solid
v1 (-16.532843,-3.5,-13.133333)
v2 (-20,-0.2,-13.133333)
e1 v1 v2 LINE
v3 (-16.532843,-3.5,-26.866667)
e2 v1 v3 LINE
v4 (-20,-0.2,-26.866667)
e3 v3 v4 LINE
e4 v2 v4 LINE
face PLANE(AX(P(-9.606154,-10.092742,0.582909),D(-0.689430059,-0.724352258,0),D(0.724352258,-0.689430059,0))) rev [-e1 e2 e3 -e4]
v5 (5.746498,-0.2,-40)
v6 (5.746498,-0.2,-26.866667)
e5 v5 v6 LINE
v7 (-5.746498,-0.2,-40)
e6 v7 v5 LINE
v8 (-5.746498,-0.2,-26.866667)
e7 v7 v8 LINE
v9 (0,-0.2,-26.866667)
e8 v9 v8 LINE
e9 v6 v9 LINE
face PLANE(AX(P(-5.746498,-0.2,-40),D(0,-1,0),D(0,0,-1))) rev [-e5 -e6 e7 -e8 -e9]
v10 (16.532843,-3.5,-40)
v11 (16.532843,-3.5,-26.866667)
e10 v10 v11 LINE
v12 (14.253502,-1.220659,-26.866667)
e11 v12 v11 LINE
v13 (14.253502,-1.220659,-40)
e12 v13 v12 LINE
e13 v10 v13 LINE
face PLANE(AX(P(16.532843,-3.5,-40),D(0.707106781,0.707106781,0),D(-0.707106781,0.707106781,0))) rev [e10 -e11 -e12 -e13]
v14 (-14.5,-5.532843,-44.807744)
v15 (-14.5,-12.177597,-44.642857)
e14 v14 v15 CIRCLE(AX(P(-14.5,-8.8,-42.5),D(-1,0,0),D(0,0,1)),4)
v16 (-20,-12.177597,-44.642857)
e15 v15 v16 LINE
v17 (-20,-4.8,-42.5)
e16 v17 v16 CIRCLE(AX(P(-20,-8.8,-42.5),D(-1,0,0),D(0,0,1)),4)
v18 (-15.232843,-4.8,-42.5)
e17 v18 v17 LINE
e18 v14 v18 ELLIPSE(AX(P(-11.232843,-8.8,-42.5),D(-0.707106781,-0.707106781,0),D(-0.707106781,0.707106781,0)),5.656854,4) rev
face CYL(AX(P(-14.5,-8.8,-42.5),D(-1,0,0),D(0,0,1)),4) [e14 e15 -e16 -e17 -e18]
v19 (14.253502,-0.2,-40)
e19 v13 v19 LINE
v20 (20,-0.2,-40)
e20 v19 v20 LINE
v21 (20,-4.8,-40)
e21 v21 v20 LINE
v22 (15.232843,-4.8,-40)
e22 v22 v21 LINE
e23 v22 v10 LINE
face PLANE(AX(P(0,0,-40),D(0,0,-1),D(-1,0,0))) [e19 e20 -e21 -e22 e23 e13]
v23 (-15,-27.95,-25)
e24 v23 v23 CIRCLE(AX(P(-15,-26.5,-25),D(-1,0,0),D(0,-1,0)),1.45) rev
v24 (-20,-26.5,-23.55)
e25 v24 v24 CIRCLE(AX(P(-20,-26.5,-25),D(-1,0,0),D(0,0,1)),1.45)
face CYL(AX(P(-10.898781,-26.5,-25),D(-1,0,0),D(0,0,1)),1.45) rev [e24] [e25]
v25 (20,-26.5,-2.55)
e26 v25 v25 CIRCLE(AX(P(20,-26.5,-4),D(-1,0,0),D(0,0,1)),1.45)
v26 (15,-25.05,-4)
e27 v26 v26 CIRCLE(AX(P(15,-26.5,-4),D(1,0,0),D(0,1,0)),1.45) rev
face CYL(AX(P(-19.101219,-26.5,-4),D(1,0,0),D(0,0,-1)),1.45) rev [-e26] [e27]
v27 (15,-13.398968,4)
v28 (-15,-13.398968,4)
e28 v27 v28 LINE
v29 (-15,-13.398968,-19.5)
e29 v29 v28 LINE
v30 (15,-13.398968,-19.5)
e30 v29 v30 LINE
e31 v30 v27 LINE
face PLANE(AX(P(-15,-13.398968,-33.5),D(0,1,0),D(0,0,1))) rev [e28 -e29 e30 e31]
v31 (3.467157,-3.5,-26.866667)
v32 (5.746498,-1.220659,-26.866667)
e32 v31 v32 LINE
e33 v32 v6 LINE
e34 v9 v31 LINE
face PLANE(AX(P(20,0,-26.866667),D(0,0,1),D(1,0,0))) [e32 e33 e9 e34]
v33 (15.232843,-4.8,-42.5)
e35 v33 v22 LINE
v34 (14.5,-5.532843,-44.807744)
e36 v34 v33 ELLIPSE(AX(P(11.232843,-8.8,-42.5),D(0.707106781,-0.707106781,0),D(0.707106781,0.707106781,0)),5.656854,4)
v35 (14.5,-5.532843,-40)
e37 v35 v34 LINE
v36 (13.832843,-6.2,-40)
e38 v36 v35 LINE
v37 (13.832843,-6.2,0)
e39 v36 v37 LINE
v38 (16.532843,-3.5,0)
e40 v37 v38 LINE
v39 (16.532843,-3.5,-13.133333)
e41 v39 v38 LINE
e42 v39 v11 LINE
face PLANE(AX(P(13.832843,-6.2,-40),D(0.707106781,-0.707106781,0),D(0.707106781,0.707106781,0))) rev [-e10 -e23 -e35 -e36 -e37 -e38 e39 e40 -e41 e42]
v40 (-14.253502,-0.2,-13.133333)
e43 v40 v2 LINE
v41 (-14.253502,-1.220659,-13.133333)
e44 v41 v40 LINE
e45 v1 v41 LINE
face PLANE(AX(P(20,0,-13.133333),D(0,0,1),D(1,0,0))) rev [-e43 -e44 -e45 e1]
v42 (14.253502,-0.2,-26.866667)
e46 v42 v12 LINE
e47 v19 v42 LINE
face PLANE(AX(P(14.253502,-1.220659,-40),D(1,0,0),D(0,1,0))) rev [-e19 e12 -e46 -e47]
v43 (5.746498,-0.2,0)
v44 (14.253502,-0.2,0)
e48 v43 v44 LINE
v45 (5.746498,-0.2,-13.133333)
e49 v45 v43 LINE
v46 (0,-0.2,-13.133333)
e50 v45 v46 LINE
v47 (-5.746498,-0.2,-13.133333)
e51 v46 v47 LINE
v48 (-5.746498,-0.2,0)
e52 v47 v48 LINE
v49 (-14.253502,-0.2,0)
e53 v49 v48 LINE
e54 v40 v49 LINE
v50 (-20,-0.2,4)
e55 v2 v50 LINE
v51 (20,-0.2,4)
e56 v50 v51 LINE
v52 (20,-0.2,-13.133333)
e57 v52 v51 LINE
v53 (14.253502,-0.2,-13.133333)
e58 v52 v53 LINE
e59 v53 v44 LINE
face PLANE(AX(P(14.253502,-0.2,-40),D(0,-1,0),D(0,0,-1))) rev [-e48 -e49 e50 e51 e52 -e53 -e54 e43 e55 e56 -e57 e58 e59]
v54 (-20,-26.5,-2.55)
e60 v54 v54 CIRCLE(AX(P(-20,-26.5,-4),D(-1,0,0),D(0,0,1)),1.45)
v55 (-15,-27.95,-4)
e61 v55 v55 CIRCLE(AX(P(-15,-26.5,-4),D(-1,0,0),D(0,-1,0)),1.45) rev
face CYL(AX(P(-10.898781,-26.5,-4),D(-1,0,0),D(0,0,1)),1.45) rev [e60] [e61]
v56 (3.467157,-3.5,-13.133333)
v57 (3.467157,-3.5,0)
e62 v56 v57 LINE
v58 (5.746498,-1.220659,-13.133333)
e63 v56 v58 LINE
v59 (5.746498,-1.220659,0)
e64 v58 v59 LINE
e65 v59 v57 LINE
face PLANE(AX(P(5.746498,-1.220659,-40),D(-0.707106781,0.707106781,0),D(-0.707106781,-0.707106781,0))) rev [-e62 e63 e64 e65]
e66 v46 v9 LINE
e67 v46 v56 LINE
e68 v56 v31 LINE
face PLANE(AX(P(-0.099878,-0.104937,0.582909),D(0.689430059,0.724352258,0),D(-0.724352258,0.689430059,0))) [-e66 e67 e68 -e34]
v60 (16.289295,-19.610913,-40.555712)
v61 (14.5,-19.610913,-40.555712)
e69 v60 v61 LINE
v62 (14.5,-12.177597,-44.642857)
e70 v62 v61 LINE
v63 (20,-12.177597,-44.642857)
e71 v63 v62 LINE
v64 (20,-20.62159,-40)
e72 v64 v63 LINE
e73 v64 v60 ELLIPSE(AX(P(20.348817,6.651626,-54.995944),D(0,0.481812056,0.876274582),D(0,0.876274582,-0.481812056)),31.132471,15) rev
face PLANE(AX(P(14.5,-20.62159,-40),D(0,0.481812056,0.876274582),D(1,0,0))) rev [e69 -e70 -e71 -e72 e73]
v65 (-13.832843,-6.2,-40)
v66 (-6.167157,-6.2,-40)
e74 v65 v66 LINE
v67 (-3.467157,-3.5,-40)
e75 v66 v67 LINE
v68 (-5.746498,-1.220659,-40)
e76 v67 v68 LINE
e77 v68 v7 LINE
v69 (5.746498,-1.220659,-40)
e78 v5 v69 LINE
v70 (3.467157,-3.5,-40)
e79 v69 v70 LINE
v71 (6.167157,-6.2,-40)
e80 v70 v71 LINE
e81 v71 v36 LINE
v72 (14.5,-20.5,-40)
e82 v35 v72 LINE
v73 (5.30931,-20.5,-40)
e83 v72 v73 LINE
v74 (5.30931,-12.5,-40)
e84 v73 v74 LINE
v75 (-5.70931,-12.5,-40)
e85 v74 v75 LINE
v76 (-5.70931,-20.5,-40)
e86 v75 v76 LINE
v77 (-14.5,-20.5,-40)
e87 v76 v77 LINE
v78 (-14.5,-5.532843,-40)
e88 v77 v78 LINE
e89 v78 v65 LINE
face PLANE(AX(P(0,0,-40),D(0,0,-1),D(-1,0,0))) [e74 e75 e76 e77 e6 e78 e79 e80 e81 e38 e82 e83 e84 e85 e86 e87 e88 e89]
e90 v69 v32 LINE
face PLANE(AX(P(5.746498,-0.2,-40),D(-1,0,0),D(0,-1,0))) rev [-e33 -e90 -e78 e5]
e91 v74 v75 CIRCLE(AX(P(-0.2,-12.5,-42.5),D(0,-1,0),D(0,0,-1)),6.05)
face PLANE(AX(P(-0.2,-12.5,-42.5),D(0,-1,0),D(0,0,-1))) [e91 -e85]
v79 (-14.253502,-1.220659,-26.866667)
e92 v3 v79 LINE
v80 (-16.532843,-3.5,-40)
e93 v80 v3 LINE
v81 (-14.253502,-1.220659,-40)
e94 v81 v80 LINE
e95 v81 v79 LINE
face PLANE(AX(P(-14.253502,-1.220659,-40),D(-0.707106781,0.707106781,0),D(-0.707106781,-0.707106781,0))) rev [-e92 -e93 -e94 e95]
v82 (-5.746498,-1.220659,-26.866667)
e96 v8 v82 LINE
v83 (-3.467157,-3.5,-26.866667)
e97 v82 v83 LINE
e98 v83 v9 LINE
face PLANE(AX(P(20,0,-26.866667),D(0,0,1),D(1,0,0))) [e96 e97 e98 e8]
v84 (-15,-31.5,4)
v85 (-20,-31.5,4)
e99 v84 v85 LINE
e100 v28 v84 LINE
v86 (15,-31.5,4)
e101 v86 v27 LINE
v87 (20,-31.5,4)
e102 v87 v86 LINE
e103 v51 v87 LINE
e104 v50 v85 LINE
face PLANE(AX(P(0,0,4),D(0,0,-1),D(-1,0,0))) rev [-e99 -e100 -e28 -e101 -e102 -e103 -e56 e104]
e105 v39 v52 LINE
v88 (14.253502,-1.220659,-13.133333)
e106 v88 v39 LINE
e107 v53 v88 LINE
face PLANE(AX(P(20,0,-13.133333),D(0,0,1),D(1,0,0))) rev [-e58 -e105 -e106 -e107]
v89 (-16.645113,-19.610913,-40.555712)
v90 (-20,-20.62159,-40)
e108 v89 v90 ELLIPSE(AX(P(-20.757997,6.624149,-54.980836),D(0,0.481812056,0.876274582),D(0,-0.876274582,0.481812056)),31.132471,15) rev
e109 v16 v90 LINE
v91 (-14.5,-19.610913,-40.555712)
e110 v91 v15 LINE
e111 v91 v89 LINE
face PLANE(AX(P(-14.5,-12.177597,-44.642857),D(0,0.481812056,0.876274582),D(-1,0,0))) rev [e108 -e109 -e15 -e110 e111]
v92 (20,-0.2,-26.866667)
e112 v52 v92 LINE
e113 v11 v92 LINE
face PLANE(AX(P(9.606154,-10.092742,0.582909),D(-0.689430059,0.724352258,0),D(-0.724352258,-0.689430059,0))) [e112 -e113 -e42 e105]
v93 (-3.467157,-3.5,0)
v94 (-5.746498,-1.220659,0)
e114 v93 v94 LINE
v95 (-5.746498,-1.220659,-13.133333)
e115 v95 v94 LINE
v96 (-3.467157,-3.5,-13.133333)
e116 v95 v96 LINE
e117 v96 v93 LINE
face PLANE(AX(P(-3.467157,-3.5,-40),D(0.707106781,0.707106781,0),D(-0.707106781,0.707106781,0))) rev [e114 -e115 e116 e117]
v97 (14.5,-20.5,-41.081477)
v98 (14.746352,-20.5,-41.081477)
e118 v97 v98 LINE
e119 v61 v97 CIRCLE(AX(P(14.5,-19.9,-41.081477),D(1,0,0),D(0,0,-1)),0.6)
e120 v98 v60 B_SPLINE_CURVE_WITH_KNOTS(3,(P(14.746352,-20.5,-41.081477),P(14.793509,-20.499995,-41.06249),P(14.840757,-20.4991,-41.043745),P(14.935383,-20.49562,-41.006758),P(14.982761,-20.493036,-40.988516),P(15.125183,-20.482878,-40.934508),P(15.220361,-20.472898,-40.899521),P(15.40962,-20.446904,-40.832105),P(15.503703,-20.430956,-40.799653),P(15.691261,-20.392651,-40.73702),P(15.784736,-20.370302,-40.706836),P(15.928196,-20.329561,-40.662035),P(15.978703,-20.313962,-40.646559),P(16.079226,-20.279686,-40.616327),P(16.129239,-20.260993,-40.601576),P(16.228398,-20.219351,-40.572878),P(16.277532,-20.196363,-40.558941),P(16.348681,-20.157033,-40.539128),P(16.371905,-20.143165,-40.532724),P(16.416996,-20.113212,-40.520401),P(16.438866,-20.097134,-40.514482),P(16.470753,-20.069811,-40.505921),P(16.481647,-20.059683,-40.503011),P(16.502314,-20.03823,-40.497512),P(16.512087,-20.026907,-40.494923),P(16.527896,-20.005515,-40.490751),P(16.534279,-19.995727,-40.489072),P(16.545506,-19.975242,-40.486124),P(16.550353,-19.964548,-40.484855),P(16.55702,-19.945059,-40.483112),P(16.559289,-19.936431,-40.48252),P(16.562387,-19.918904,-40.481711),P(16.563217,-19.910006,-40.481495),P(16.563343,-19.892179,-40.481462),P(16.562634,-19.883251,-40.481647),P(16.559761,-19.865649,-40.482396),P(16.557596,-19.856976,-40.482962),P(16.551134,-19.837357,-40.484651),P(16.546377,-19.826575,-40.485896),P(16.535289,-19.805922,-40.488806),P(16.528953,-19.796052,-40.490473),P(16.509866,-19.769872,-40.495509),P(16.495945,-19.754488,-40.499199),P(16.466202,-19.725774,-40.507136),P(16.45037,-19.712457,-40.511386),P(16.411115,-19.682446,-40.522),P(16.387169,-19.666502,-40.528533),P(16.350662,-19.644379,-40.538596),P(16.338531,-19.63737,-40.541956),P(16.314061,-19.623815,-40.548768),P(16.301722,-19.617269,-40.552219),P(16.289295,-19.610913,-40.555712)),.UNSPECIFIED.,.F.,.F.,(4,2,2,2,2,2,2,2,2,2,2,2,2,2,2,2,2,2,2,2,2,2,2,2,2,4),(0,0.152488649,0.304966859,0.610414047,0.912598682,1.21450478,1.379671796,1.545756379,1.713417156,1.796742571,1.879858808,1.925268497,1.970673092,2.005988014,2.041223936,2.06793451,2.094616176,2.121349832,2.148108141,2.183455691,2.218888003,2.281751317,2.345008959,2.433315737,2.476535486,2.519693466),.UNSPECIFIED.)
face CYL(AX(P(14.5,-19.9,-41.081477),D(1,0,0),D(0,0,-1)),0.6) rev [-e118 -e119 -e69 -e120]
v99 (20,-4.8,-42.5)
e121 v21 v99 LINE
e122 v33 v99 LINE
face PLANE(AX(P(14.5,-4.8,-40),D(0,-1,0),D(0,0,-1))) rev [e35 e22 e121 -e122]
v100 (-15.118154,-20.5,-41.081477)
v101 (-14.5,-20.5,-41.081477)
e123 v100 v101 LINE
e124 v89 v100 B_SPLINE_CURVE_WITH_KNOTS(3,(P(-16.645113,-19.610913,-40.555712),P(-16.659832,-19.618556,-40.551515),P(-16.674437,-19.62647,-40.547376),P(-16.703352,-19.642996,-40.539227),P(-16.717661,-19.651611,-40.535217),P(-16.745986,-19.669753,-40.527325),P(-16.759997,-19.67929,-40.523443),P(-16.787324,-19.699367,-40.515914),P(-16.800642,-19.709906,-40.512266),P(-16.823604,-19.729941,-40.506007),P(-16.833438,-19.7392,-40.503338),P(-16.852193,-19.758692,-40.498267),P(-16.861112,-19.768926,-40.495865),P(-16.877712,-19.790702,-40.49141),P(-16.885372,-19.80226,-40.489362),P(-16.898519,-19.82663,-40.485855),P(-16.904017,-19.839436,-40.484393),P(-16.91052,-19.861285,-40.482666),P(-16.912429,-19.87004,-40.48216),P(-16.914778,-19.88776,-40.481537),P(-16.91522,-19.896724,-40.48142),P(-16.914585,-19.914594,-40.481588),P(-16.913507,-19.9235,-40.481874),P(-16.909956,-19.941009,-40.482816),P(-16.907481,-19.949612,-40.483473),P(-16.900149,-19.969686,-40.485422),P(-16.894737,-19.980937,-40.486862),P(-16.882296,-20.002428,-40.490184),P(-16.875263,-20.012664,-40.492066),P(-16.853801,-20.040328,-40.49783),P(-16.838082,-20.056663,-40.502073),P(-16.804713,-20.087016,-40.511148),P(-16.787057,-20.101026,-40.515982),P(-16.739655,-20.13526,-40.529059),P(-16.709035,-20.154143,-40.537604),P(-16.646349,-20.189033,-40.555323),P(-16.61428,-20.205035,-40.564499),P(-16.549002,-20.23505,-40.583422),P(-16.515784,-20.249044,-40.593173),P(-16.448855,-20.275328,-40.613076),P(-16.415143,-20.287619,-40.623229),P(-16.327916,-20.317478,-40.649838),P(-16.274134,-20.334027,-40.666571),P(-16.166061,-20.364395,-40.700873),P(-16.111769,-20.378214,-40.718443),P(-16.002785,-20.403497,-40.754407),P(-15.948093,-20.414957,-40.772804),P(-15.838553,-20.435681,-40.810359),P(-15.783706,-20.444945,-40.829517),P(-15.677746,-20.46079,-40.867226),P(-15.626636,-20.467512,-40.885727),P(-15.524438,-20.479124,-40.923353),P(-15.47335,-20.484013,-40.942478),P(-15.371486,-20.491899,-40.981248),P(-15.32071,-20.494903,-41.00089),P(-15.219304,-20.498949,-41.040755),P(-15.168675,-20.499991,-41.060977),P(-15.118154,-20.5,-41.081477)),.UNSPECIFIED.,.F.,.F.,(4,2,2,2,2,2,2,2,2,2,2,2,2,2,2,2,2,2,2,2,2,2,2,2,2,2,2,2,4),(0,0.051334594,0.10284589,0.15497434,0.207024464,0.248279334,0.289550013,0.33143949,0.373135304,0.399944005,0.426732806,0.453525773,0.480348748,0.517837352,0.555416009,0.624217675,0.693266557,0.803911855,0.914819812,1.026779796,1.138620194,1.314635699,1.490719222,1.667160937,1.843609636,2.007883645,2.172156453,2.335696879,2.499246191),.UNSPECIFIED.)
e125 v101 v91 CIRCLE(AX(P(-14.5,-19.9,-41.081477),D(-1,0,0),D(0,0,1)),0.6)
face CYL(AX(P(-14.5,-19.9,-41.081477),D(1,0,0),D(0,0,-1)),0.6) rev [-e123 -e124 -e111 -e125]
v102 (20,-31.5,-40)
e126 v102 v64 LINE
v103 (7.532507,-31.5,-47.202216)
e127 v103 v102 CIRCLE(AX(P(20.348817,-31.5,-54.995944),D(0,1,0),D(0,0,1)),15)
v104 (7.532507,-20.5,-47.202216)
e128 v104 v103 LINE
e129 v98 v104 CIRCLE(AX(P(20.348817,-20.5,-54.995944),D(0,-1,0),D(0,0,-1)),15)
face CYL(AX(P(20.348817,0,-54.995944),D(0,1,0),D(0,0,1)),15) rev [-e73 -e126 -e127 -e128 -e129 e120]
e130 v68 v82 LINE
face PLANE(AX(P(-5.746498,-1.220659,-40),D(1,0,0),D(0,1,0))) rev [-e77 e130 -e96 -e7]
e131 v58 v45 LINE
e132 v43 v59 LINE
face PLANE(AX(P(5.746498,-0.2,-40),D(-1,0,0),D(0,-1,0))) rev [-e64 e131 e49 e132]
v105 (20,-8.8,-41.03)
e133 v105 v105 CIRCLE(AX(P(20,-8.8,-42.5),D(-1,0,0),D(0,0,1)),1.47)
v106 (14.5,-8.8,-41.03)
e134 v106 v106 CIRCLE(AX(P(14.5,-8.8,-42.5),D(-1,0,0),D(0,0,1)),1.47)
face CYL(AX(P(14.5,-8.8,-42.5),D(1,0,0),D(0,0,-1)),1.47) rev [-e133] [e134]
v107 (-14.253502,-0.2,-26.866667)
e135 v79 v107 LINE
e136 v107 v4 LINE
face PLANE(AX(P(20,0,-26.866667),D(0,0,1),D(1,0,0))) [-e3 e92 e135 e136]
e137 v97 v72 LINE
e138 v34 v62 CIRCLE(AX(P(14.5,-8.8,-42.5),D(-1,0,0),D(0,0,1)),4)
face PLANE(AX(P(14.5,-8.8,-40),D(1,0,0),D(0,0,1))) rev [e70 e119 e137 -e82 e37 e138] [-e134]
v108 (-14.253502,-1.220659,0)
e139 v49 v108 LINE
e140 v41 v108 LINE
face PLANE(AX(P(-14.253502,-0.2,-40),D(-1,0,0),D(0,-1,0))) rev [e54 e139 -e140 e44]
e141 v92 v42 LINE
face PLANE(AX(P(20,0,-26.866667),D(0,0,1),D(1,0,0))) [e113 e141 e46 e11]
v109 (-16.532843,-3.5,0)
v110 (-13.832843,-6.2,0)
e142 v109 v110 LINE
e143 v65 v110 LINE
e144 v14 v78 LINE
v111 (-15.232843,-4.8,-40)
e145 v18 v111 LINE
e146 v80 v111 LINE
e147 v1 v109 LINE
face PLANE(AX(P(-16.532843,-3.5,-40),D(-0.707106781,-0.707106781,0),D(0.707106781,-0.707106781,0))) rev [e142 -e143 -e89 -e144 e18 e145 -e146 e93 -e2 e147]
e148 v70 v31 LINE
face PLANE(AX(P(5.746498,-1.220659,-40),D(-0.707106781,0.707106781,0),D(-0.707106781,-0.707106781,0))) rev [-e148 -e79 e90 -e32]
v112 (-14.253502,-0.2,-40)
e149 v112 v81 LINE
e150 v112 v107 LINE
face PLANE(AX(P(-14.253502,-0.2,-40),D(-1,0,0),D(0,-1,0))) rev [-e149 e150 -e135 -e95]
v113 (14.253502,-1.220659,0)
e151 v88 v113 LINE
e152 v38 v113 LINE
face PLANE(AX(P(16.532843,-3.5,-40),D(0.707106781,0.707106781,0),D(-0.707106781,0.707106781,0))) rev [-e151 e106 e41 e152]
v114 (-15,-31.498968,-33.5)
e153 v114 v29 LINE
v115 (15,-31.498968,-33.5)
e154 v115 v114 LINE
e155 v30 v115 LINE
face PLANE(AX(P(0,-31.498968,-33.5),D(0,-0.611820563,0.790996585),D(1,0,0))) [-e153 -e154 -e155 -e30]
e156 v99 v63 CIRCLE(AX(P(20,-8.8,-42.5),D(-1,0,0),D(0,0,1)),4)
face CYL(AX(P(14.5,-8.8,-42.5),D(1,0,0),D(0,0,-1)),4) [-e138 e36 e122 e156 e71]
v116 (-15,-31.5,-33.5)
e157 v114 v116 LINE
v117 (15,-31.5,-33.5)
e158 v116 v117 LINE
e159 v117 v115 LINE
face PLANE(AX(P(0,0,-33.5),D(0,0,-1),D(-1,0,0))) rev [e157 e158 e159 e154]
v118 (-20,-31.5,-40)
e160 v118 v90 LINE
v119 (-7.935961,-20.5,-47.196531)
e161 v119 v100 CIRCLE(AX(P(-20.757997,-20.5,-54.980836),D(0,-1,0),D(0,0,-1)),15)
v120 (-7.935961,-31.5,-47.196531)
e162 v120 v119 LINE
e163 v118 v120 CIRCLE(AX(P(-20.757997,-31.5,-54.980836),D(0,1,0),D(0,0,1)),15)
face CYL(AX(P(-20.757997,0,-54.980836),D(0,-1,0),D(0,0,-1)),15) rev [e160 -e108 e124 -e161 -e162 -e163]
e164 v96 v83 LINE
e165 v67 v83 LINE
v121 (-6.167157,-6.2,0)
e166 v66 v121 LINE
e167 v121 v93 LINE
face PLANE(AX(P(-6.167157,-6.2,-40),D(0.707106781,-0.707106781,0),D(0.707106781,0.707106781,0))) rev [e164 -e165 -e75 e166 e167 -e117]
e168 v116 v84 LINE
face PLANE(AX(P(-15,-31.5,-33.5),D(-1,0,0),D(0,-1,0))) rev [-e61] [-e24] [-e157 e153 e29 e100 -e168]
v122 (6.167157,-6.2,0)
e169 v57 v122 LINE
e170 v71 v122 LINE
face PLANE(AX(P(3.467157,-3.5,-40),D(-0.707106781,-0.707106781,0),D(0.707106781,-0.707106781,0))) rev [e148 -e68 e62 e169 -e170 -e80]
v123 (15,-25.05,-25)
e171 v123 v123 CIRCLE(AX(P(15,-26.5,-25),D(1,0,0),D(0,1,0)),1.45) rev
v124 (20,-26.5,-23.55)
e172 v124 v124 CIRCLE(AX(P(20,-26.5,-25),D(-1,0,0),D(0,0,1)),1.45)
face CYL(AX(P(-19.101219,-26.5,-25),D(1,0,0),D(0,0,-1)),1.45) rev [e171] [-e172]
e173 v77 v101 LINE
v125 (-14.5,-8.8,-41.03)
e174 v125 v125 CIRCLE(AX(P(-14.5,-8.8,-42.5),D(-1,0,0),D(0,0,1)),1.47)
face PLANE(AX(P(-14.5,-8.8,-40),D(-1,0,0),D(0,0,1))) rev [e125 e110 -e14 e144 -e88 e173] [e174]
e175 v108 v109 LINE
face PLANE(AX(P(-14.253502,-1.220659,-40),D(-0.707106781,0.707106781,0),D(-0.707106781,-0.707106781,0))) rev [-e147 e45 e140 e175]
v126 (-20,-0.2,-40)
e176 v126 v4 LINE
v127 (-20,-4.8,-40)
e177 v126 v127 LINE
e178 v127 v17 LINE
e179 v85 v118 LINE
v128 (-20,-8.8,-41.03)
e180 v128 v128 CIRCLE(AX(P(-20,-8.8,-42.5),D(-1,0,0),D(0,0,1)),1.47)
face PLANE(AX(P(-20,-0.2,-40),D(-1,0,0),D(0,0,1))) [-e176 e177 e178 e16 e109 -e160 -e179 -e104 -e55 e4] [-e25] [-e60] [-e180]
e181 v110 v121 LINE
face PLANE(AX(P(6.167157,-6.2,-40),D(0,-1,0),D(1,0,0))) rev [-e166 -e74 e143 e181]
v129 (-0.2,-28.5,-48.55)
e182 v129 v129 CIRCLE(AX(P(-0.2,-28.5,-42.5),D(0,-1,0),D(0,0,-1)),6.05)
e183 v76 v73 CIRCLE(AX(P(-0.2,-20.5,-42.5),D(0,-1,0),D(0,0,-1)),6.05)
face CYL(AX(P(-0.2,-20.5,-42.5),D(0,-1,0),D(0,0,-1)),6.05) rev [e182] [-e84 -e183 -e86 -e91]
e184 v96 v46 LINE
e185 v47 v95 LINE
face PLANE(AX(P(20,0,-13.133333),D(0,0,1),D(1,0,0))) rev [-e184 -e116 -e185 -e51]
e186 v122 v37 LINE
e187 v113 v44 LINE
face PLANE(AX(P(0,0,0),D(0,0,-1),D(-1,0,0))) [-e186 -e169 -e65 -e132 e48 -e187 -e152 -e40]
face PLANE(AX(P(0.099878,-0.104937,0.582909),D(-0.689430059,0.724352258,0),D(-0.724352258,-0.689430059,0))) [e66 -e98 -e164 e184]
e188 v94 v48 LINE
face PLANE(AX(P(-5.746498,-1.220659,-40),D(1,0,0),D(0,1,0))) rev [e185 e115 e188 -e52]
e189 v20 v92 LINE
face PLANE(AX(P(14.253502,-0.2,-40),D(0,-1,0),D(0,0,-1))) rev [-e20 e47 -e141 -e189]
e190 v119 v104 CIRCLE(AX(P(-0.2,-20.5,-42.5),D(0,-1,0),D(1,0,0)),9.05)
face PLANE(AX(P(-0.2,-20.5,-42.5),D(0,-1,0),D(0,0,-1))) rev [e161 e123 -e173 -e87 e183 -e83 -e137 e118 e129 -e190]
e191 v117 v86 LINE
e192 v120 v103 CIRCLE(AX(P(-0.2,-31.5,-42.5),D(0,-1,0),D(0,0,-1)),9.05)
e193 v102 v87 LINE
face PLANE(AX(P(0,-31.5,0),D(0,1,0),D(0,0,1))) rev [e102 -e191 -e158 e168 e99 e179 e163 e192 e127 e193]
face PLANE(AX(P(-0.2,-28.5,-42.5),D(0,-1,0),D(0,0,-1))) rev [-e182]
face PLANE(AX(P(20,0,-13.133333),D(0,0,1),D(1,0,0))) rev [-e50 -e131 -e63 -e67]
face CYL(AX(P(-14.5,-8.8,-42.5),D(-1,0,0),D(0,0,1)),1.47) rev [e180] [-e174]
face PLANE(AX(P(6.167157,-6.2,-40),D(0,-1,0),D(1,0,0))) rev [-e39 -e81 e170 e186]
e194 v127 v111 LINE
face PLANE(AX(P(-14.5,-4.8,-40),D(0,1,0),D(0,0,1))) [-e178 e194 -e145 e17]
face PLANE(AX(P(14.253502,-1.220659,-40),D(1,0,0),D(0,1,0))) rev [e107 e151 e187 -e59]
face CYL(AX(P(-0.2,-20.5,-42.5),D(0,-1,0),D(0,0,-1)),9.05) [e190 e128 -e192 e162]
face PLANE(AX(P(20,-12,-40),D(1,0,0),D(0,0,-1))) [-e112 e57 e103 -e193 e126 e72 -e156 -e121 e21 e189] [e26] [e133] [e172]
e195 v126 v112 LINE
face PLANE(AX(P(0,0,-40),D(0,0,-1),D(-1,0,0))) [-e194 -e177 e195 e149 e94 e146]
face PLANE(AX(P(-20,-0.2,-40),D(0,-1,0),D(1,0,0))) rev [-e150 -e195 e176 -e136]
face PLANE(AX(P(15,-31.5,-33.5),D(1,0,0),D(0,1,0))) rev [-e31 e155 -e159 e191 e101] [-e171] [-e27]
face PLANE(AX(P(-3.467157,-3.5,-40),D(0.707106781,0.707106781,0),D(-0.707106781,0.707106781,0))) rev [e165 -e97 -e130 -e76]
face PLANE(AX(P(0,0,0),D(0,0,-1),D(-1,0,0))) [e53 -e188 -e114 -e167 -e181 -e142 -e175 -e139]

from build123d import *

# Parameters (mm, degrees)
BOSS_EXTRUDE1_DEPTH     = 40
SKETCH2_W               = 13.73333333
SKETCH2_H               = 6
CUT_EXTRUDE1_DEPTH      = 58.827329179
SKETCH3_W               = 40
SKETCH3_H               = 11.8
BOSS_EXTRUDE2_DEPTH     = 4
BOSS_EXTRUDE3_DEPTH     = 13.73333333
SKETCH10_R              = 1.47
BOSS_EXTRUDE7_DEPTH     = 5.5
SKETCH13_W              = 40
SKETCH13_H              = 44
BOSS_EXTRUDE8_DEPTH     = 19.5
CHAMFER2_START          = -20
CHAMFER2_DEPTH          = 5.5
EXTRUDE_THIN1_START     = -3
SKETCH14_R              = 9.05
SKETCH14_R_2            = 6.05
EXTRUDE_THIN1_DEPTH     = 8
BOSS_EXTRUDE9_START     = 3
BOSS_EXTRUDE9_DEPTH     = 3
FILLET1_START           = -31.5
FILLET1_DEPTH           = 11
SKETCH16_W              = 30
SKETCH16_H              = 18.101031733
CUT_EXTRUDE4_DEPTH      = 37.5
CHAMFER1_SIZE           = 14
CHAMFER1_SIZE2          = 18.1
SKETCH17_R              = 1.45
CUT_EXTRUDE5_DEPTH      = 35
SKETCH18_R              = 6.05
CUT_EXTRUDE6_DEPTH      = 16
FILLET2_R               = 0.6
CUT_EXTRUDE7_DEPTH      = 58.690987254
CUT_EXTRUDE7_DEPTH_BACK = 10


with BuildPart() as part:
    # Sketch1 → Boss-Extrude1 (new body)
    with BuildSketch(Plane.XY):
        Polygon((-20, -0.2), (-20, -12), (20, -12), (20, -0.2), (14.253501692, -0.2), (14.253501692, -1.22065898), (16.532842712, -3.5), (13.832842712, -6.2), (6.167157288, -6.2), (3.467157288, -3.5), (5.746498308, -1.22065898), (5.746498308, -0.2), (-5.746498308, -0.2), (-5.746498308, -1.22065898), (-3.467157288, -3.5), (-6.167157288, -6.2), (-13.832842712, -6.2), (-16.532842712, -3.5), (-14.253501692, -1.22065898), (-14.253501692, -0.2), align=None)
    extrude(amount=-BOSS_EXTRUDE1_DEPTH)

    # Sketch2 → Cut-Extrude1 (cut, through all)
    with BuildSketch(Plane.ZY.offset(20)):
        with Locations((-20, -3.2)):
            Rectangle(SKETCH2_W, SKETCH2_H)
    extrude(amount=-CUT_EXTRUDE1_DEPTH, mode=Mode.SUBTRACT)

    # Sketch3 → Boss-Extrude2 (add)
    with BuildSketch(Plane.XY):
        with Locations((0, -6.1)):
            Rectangle(SKETCH3_W, SKETCH3_H)
    extrude(amount=BOSS_EXTRUDE2_DEPTH)

    # Sketch4 → Boss-Extrude3 (add)
    with BuildSketch(Plane.XY.offset(-26.866666665)):
        Polygon((-20, -0.2), (-20, -6.2), (-13.832842712, -6.2), (-16.532842712, -3.5), align=None)
        Polygon((-6.167157288, -6.2), (6.167157288, -6.2), (3.467157288, -3.5), (0, -0.2), (-3.467157288, -3.5), align=None)
        Polygon((13.832842712, -6.2), (20, -6.2), (20, -0.2), (16.532842712, -3.5), align=None)
    extrude(amount=BOSS_EXTRUDE3_DEPTH)

    # Sketch10 → Boss-Extrude7 (add)
    with BuildSketch(Plane.ZY.offset(20)):
        with BuildLine():
            Line((-40, -12.8), (-42.5, -12.8))
            ThreePointArc((-42.5, -12.8), (-46.5, -8.8), (-42.5, -4.8))
            Line((-42.5, -4.8), (-40, -4.8))
            ThreePointArc((-40, -4.8), (-36, -8.8), (-40, -12.8))
        make_face()
        with Locations((-42.5, -8.8)):
            Circle(SKETCH10_R, mode=Mode.SUBTRACT)
    boss_extrude7 = extrude(amount=-BOSS_EXTRUDE7_DEPTH)

    # Sketch13 → Boss-Extrude8 (add)
    with BuildSketch(Plane.XZ.offset(12)):
        with Locations((0, -18)):
            Rectangle(SKETCH13_W, SKETCH13_H)
    extrude(amount=BOSS_EXTRUDE8_DEPTH)

    # Chamfer2: read off the stored shape, not the designer's step
    # Chamfer2 outline → Chamfer2 (add)
    with BuildSketch(Plane.YZ.offset(CHAMFER2_START)):
        with BuildLine():
            Line((-20.621590418, -40), (-12.177597262, -44.642857143))
            ThreePointArc((-12.177597262, -44.642857143), (-12.641249084, -43.615708508), (-12.8, -42.5))
            Line((-12.8, -42.5), (-12.8, -40))
            Line((-12.8, -40), (-20.621590418, -40))
        make_face()
    chamfer2 = extrude(amount=CHAMFER2_DEPTH)

    # Mirror1: Boss-Extrude7, Chamfer2 across plane
    add(boss_extrude7.mirror(Plane(origin=(0, 0, 0), x_dir=(0, 0, 1), z_dir=(1, 0, 0))))
    add(chamfer2.mirror(Plane(origin=(0, 0, 0), x_dir=(0, 0, 1), z_dir=(1, 0, 0))))

    # Sketch14 → Extrude-Thin1 (add)
    with BuildSketch(Plane.XZ.offset(31.5).offset(EXTRUDE_THIN1_START)):
        with Locations((-0.2, -42.5)):
            Circle(SKETCH14_R)
        with Locations((-0.2, -42.5)):
            Circle(SKETCH14_R_2, mode=Mode.SUBTRACT)
    extrude(amount=-EXTRUDE_THIN1_DEPTH)

    # Sketch15 → Boss-Extrude9 (add)
    with BuildSketch(Plane.XZ.offset(28.5).offset(BOSS_EXTRUDE9_START)):
        with BuildLine():
            Line((8.497844561, -40), (-8.897844561, -40))
            ThreePointArc((-8.897844561, -40), (-0.2, -51.55), (8.497844561, -40))
        make_face()
    extrude(amount=-BOSS_EXTRUDE9_DEPTH)

    # Fillet1: read off the stored shape, not the designer's step
    # Fillet1 outline → Fillet1 (add)
    with BuildSketch(Plane(origin=(0, 0, 0), x_dir=(1, 0, 0), z_dir=(0, 1, 0)).offset(FILLET1_START)):
        with BuildLine():
            ThreePointArc((20, 40), (12.845609752, 42.00741501), (7.532507128, 47.202215809))
            ThreePointArc((7.532507128, 47.202215809), (8.769787751, 43.7022511), (8.497844561, 40))
            Line((8.497844561, 40), (20, 40))
        make_face()
        with BuildLine():
            ThreePointArc((-8.897844561, 40), (-9.170229006, 43.698954374), (-7.935961427, 47.196530719))
            ThreePointArc((-7.935961427, 47.196530719), (-13.07347783, 42.098748758), (-20, 40))
            Line((-20, 40), (-8.897844561, 40))
        make_face()
    extrude(amount=FILLET1_DEPTH)

    # Sketch16 → Cut-Extrude4 (cut)
    with BuildSketch(Plane.XY.offset(4)):
        with Locations((0, -22.449484134)):
            Rectangle(SKETCH16_W, SKETCH16_H)
    extrude(amount=-CUT_EXTRUDE4_DEPTH, mode=Mode.SUBTRACT)

    # Chamfer1
    chamfer1_edges = [part.edges().sort_by_distance(p)[0] for p in [
        (0, -13.398968267, -33.5),
    ]]
    chamfer1_side = [part.faces().sort_by_distance(p)[0] for p in [
        (0, -13.398968267, -14.75),
    ]]
    chamfer(chamfer1_edges, length=CHAMFER1_SIZE, length2=CHAMFER1_SIZE2, reference=chamfer1_side[0])

    # Sketch17 → Cut-Extrude5 (cut)
    with BuildSketch(Plane.ZY.offset(20)):
        with Locations((-4, -26.5)):
            Circle(SKETCH17_R)
        with Locations((-25, -26.5)):
            Circle(SKETCH17_R)
    cut_extrude5 = extrude(amount=-CUT_EXTRUDE5_DEPTH, mode=Mode.SUBTRACT)

    # Mirror3: Cut-Extrude5 across plane
    add(cut_extrude5.mirror(Plane(origin=(0, 0, 0), x_dir=(0, 0, 1), z_dir=(1, 0, 0))), mode=Mode.SUBTRACT)

    # Sketch18 → Cut-Extrude6 (cut)
    with BuildSketch(Plane(origin=(0, -28.5, 0), x_dir=(1, 0, 0), z_dir=(0, 1, 0))):
        with Locations(Location((-0.2, 42.5, 0), (0, 0, 90))):
            Circle(SKETCH18_R)
    extrude(amount=CUT_EXTRUDE6_DEPTH, mode=Mode.SUBTRACT)

    # Fillet2
    fillet2_edges = [part.edges().sort_by_distance(p)[0] for p in [
        (16.695998577, -20.5, -40.066855447),
        (-16.826940077, -20.5, -40.066855447),
    ]]
    fillet(fillet2_edges, radius=FILLET2_R)

    # Sketch19 → Cut-Extrude7 (cut, two sides: drawn at the far end of the back side and taken through both)
    with BuildSketch(Plane(origin=(0, 0, -40), x_dir=(-1, 0, 0), z_dir=(0, 0, -1)).offset(-CUT_EXTRUDE7_DEPTH_BACK)):
        Polygon((16.532842712, -3.5), (15.232842712, -4.8), (14.5, -5.532842712), (13.832842712, -6.2), (10, -6.2), (10, -3.5), align=None)
        Polygon((-13.832842712, -6.2), (-14.5, -5.532842712), (-15.232842712, -4.8), (-16.532842712, -3.5), (-10, -3.5), (-10, -6.2), align=None)
    extrude(amount=CUT_EXTRUDE7_DEPTH + CUT_EXTRUDE7_DEPTH_BACK, mode=Mode.SUBTRACT)


solid = part.part
